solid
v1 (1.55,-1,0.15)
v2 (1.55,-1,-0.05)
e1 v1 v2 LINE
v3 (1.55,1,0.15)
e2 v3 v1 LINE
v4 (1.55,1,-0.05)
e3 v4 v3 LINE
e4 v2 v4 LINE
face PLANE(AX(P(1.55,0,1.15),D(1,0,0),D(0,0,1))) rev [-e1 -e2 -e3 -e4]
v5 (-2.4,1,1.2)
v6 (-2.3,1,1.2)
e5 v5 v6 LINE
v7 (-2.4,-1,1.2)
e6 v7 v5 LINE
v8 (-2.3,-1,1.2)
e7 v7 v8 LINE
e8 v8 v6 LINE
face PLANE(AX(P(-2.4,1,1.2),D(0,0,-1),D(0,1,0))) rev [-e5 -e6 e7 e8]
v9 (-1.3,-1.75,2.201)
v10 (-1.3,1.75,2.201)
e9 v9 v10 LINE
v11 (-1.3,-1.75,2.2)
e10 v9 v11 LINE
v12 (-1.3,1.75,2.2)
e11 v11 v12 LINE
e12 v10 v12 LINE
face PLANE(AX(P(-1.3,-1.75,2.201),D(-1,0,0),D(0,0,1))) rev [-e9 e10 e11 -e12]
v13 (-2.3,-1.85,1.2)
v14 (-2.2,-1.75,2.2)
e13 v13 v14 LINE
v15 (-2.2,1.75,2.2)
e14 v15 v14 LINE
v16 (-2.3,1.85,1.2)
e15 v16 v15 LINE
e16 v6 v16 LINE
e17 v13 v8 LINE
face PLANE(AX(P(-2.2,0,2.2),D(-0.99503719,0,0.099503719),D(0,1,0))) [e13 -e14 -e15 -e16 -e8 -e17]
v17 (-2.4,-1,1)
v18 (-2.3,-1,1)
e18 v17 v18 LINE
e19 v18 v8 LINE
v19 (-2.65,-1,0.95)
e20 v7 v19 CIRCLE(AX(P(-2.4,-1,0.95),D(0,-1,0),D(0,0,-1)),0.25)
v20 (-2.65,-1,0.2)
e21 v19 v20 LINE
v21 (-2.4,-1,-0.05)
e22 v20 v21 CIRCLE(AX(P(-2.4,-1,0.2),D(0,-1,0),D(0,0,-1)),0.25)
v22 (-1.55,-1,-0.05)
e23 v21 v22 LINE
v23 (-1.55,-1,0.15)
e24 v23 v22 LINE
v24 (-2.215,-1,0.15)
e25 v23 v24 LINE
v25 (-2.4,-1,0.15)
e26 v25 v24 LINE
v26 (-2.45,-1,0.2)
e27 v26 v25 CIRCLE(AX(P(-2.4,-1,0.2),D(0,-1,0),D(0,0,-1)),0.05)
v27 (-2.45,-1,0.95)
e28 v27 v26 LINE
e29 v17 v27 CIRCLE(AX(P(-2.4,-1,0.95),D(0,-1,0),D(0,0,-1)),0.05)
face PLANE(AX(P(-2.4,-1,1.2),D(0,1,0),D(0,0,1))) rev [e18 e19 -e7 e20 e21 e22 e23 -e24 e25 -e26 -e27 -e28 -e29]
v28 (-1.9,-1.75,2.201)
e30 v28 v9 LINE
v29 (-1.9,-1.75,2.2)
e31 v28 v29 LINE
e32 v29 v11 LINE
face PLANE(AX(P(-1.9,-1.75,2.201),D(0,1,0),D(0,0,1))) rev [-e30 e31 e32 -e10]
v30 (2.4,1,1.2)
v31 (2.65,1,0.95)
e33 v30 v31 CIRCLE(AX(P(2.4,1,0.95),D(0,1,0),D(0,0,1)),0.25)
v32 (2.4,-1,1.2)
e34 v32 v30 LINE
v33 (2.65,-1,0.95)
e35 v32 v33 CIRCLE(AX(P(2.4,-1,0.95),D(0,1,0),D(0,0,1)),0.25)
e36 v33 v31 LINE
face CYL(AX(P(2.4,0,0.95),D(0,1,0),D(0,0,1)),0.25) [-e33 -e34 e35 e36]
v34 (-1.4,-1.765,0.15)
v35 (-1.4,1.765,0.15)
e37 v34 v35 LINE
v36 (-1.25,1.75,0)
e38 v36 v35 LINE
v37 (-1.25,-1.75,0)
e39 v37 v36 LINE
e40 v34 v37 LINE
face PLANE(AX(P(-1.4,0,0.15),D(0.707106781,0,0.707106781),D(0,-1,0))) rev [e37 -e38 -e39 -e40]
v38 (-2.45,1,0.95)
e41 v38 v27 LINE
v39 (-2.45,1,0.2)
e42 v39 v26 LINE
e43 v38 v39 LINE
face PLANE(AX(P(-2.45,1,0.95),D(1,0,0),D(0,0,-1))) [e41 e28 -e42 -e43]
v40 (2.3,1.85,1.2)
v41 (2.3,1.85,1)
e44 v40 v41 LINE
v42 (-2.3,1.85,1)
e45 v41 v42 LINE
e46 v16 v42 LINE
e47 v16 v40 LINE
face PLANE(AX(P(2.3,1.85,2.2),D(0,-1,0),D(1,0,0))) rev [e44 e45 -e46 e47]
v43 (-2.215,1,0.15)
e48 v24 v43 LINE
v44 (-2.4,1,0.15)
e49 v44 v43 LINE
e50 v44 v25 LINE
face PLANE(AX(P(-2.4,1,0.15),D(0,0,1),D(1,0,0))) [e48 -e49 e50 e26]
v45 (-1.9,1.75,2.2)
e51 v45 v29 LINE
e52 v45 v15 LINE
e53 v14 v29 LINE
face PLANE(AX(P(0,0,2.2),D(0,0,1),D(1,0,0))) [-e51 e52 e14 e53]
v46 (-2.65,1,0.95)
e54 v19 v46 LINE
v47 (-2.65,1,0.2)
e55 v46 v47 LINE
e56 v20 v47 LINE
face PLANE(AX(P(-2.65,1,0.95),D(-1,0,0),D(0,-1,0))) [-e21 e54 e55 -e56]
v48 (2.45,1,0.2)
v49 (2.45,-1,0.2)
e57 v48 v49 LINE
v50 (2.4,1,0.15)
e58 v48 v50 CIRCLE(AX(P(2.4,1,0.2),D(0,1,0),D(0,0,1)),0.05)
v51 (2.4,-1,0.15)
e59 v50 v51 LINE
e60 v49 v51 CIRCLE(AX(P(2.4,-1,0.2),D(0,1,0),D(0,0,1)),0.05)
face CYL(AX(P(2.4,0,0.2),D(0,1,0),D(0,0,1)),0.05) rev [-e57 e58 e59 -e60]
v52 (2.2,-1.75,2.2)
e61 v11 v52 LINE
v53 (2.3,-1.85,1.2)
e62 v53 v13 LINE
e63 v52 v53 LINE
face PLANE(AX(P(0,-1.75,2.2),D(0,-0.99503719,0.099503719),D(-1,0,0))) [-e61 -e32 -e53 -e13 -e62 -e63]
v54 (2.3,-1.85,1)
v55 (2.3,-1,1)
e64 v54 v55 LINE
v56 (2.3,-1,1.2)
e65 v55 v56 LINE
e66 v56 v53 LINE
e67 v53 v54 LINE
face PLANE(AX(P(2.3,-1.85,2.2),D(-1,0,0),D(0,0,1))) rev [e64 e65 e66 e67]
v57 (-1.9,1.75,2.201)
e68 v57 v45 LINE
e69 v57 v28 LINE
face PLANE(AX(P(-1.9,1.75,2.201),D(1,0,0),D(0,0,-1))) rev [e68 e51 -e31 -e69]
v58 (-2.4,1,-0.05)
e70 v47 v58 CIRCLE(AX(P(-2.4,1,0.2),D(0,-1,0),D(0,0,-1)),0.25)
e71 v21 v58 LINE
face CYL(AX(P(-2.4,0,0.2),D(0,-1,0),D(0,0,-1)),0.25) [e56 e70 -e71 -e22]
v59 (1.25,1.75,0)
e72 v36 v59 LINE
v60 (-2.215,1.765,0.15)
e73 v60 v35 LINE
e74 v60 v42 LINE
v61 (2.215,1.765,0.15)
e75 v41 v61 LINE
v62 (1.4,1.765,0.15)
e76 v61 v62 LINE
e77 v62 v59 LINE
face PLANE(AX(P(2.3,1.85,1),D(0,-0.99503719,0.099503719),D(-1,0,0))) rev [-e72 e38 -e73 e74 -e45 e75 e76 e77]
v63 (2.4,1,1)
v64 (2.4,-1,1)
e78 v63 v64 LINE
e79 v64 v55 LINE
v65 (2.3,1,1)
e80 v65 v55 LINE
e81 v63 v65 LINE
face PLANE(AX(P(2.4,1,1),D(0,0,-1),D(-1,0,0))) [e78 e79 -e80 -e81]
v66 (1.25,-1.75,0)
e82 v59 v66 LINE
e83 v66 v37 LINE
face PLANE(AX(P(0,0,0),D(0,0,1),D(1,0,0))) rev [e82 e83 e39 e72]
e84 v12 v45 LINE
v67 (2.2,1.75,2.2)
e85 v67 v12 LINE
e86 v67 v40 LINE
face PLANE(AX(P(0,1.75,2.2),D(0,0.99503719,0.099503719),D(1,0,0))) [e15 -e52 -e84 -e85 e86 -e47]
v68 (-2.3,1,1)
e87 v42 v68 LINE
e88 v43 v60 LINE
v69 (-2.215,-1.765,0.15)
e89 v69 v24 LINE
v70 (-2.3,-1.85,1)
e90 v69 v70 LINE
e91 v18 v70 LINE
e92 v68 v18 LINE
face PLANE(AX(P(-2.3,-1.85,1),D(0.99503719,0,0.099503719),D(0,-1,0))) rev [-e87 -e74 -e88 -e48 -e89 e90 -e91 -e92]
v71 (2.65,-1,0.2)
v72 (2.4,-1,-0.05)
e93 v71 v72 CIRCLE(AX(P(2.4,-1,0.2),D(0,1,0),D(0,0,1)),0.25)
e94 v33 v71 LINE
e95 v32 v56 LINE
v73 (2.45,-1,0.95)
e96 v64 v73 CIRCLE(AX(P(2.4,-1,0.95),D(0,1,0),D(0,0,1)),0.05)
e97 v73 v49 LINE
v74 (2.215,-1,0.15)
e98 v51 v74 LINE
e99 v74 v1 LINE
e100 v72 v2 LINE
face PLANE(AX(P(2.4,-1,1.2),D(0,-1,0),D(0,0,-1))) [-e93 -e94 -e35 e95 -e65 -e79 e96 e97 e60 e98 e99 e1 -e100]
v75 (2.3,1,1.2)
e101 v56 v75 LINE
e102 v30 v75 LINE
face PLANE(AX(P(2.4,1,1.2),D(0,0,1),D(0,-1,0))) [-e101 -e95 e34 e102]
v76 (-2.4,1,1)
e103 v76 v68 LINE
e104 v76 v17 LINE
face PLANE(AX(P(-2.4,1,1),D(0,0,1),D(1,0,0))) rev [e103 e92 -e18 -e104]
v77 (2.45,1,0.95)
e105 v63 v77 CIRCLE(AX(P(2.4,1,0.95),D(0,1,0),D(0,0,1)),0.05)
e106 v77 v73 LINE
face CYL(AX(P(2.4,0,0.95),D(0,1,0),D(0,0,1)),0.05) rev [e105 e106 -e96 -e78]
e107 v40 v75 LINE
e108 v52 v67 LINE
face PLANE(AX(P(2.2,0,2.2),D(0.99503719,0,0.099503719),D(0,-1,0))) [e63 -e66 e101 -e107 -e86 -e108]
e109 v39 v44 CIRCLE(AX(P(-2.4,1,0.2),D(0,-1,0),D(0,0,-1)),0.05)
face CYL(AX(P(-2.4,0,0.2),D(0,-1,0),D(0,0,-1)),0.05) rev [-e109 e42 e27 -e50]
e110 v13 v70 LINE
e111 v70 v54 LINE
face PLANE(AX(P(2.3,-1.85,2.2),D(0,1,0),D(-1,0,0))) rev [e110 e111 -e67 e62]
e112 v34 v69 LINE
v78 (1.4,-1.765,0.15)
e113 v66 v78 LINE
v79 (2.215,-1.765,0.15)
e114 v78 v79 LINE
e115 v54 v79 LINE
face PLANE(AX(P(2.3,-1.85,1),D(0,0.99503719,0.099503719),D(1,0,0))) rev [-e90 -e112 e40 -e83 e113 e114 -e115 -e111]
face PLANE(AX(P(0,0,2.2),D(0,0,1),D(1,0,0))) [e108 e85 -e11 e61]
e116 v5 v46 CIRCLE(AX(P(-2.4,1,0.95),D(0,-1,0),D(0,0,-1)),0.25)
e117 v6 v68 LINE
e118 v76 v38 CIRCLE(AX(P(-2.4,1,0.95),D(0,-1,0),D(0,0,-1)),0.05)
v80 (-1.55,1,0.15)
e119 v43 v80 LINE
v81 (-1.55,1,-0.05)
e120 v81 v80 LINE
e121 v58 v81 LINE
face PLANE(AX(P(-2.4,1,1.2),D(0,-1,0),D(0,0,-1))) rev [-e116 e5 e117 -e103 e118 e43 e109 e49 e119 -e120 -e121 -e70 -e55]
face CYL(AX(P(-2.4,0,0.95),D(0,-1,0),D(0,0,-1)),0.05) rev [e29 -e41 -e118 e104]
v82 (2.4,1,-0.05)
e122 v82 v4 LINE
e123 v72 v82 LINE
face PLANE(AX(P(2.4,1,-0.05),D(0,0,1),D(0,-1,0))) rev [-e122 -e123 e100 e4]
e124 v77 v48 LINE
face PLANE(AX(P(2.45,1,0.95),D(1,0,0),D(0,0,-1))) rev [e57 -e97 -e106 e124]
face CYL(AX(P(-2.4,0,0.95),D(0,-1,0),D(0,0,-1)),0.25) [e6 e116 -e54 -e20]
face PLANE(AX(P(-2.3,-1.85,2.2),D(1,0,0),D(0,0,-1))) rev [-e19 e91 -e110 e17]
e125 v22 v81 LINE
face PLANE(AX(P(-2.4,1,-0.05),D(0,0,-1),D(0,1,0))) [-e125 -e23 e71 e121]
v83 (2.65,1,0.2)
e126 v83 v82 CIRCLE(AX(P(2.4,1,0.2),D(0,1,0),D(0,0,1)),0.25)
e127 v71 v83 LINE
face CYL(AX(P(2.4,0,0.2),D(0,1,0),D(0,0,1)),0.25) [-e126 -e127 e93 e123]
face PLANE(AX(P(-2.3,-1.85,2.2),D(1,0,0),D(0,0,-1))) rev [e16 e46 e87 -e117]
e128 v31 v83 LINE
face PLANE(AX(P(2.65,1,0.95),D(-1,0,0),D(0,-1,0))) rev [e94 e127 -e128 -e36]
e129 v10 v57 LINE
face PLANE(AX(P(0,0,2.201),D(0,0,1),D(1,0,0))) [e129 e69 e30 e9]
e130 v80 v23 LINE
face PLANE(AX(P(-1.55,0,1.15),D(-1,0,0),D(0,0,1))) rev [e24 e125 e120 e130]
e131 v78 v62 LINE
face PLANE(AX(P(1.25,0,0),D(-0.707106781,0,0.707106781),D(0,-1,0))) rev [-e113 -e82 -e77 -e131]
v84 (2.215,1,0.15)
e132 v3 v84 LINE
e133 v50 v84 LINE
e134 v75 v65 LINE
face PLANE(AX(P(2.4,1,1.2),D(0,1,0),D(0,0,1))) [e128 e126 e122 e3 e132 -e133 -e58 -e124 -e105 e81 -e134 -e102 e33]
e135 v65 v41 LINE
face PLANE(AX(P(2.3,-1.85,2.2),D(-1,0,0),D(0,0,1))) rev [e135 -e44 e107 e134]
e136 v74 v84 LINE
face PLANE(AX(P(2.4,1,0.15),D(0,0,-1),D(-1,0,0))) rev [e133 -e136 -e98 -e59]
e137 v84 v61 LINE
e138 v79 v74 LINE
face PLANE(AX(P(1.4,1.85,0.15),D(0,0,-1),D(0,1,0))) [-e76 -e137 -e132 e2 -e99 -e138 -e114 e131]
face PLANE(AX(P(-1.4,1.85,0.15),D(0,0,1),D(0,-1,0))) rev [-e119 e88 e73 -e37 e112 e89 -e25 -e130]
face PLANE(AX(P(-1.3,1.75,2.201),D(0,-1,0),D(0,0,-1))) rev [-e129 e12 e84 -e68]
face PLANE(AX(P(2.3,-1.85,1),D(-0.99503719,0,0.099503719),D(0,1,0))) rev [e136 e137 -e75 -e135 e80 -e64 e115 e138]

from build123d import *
from OCP.BRepFilletAPI import BRepFilletAPI_MakeChamfer

# Parameters (mm, degrees)
SZKIC1_W                    = 4.6
SZKIC1_H                    = 3.7
DODANIE_WYCI_GNI_CIE1_DEPTH = 2.2
SFAZOWANIE1_SIZE            = 1
SFAZOWANIE1_SIZE2           = 0.1
SFAZOWANIE2_SIZE            = 0.1
SFAZOWANIE2_SIZE2           = 1
SZKIC2_W                    = 0.6
SZKIC2_H                    = 3.5
DODANIE_WYCI_GNI_CIE2_DEPTH = 0.001
SZKIC5_W                    = 0.15
SZKIC5_H                    = 3.7
WYTNIJ_WYCI_GNI_CIE1_DEPTH  = 0.9
SFAZOWANIE3_SIZE            = 0.15
SZKIC3_W                    = 0.2
SZKIC3_H                    = 2
SFAZOWANIE3_OF_LUSTRO1_SIZE = 0.15


with BuildPart() as part:
    # Szkic1 → Dodanie-wyciągnięcie1 (new body)
    with BuildSketch(Plane.XY):
        Rectangle(SZKIC1_W, SZKIC1_H)
    extrude(amount=DODANIE_WYCI_GNI_CIE1_DEPTH)

    # Sfazowanie1: one chamfer whose edges measure the first distance from different faces: ONE call of the kernel's chamfer builder (chamfer() names one face for all edges)
    sfazowanie1_edges_1 = [part.edges().sort_by_distance(p)[0] for p in [
        (2.3, 0, 2.2),
    ]]
    sfazowanie1_side_1 = [part.faces().sort_by_distance(p)[0] for p in [
        (2.3, 0, 1.1),
    ]]
    sfazowanie1_edges_2 = [part.edges().sort_by_distance(p)[0] for p in [
        (0, 1.85, 2.2),
    ]]
    sfazowanie1_side_2 = [part.faces().sort_by_distance(p)[0] for p in [
        (0, 1.85, 1.1),
    ]]
    sfazowanie1_edges_3 = [part.edges().sort_by_distance(p)[0] for p in [
        (-2.3, 0, 2.2),
    ]]
    sfazowanie1_side_3 = [part.faces().sort_by_distance(p)[0] for p in [
        (-2.3, 0, 1.1),
    ]]
    sfazowanie1_edges_4 = [part.edges().sort_by_distance(p)[0] for p in [
        (0, -1.85, 2.2),
    ]]
    sfazowanie1_side_4 = [part.faces().sort_by_distance(p)[0] for p in [
        (0, -1.85, 1.1),
    ]]
    sfazowanie1 = BRepFilletAPI_MakeChamfer(part.part.solid().wrapped)
    for e in sfazowanie1_edges_1:
        sfazowanie1.Add(SFAZOWANIE1_SIZE, SFAZOWANIE1_SIZE2, e.wrapped, sfazowanie1_side_1[0].wrapped)  # the first distance lies on this face
    for e in sfazowanie1_edges_2:
        sfazowanie1.Add(SFAZOWANIE1_SIZE, SFAZOWANIE1_SIZE2, e.wrapped, sfazowanie1_side_2[0].wrapped)  # the first distance lies on this face
    for e in sfazowanie1_edges_3:
        sfazowanie1.Add(SFAZOWANIE1_SIZE, SFAZOWANIE1_SIZE2, e.wrapped, sfazowanie1_side_3[0].wrapped)  # the first distance lies on this face
    for e in sfazowanie1_edges_4:
        sfazowanie1.Add(SFAZOWANIE1_SIZE, SFAZOWANIE1_SIZE2, e.wrapped, sfazowanie1_side_4[0].wrapped)  # the first distance lies on this face
    add(Compound.cast(sfazowanie1.Shape()), mode=Mode.REPLACE)

    # Sfazowanie2
    sfazowanie2_edges = [part.edges().sort_by_distance(p)[0] for p in [
        (0, 1.85, 0),
        (2.3, 0, 0),
        (0, -1.85, 0),
        (-2.3, 0, 0),
    ]]
    sfazowanie2_side = [part.faces().sort_by_distance(p)[0] for p in [
        (0, 0, 0),
    ]]
    chamfer(sfazowanie2_edges, length=SFAZOWANIE2_SIZE, length2=SFAZOWANIE2_SIZE2, reference=sfazowanie2_side[0])

    # Szkic2 → Dodanie-wyciągnięcie2 (add)
    with BuildSketch(Plane.XY.offset(2.2)):
        with Locations((-1.6, 0)):
            Rectangle(SZKIC2_W, SZKIC2_H)
    extrude(amount=DODANIE_WYCI_GNI_CIE2_DEPTH)

    # Szkic5 → Wytnij-wyciągnięcie1 (cut)
    with BuildSketch(Plane.ZY.offset(2.3)):
        with Locations((0.075, 0)):
            Rectangle(SZKIC5_W, SZKIC5_H)
    wytnij_wyci_gni_cie1 = extrude(amount=-WYTNIJ_WYCI_GNI_CIE1_DEPTH, mode=Mode.SUBTRACT)

    # Sfazowanie3
    sfazowanie3_edges = [part.edges().sort_by_distance(p)[0] for p in [
        (-1.4, 0, 0),
    ]]
    chamfer(sfazowanie3_edges, length=SFAZOWANIE3_SIZE - 0.0001)  # a hair under: the kernel refuses the full size

    # Wyciągnięcie po ścieżce1: sweep along a path in Szkic4
    with BuildLine(Plane(origin=(0, 0, 0), x_dir=(1, 0, 0), z_dir=(0, 1, 0))) as wyci_gni_cie_po_cie_ce1_path:
        Line((-2.3, -1.2), (-2.4, -1.2))
        ThreePointArc((-2.4, -1.2), (-2.576776695, -1.126776695), (-2.65, -0.95))
        Line((-2.65, -0.95), (-2.65, -0.2))
        ThreePointArc((-2.65, -0.2), (-2.576776695, -0.023223305), (-2.4, 0.05))
        Line((-2.4, 0.05), (-1.55, 0.05))
    # Szkic3 → Wyciągnięcie po ścieżce1 (sweep)
    with BuildSketch(Plane.ZY.offset(2.3)):
        with Locations((1.1, 0)):
            Rectangle(SZKIC3_W, SZKIC3_H)
    wyci_gni_cie_po_cie_ce1 = sweep(path=wyci_gni_cie_po_cie_ce1_path.line)

    # Lustro1: Wytnij-wyciągnięcie1, Wyciągnięcie po ścieżce1 across plane
    add(wytnij_wyci_gni_cie1.mirror(Plane(origin=(0, 0, 0), x_dir=(0, 0, 1), z_dir=(1, 0, 0))), mode=Mode.SUBTRACT)
    add(wyci_gni_cie_po_cie_ce1.mirror(Plane(origin=(0, 0, 0), x_dir=(0, 0, 1), z_dir=(1, 0, 0))))

    # Sfazowanie3 of Lustro1
    sfazowanie3_of_lustro1_edges = [part.edges().sort_by_distance(p)[0] for p in [
        (1.4, 0, 0),
    ]]
    chamfer(sfazowanie3_of_lustro1_edges, length=SFAZOWANIE3_OF_LUSTRO1_SIZE - 0.0001)  # a hair under: the kernel refuses the full size


solid = part.part
